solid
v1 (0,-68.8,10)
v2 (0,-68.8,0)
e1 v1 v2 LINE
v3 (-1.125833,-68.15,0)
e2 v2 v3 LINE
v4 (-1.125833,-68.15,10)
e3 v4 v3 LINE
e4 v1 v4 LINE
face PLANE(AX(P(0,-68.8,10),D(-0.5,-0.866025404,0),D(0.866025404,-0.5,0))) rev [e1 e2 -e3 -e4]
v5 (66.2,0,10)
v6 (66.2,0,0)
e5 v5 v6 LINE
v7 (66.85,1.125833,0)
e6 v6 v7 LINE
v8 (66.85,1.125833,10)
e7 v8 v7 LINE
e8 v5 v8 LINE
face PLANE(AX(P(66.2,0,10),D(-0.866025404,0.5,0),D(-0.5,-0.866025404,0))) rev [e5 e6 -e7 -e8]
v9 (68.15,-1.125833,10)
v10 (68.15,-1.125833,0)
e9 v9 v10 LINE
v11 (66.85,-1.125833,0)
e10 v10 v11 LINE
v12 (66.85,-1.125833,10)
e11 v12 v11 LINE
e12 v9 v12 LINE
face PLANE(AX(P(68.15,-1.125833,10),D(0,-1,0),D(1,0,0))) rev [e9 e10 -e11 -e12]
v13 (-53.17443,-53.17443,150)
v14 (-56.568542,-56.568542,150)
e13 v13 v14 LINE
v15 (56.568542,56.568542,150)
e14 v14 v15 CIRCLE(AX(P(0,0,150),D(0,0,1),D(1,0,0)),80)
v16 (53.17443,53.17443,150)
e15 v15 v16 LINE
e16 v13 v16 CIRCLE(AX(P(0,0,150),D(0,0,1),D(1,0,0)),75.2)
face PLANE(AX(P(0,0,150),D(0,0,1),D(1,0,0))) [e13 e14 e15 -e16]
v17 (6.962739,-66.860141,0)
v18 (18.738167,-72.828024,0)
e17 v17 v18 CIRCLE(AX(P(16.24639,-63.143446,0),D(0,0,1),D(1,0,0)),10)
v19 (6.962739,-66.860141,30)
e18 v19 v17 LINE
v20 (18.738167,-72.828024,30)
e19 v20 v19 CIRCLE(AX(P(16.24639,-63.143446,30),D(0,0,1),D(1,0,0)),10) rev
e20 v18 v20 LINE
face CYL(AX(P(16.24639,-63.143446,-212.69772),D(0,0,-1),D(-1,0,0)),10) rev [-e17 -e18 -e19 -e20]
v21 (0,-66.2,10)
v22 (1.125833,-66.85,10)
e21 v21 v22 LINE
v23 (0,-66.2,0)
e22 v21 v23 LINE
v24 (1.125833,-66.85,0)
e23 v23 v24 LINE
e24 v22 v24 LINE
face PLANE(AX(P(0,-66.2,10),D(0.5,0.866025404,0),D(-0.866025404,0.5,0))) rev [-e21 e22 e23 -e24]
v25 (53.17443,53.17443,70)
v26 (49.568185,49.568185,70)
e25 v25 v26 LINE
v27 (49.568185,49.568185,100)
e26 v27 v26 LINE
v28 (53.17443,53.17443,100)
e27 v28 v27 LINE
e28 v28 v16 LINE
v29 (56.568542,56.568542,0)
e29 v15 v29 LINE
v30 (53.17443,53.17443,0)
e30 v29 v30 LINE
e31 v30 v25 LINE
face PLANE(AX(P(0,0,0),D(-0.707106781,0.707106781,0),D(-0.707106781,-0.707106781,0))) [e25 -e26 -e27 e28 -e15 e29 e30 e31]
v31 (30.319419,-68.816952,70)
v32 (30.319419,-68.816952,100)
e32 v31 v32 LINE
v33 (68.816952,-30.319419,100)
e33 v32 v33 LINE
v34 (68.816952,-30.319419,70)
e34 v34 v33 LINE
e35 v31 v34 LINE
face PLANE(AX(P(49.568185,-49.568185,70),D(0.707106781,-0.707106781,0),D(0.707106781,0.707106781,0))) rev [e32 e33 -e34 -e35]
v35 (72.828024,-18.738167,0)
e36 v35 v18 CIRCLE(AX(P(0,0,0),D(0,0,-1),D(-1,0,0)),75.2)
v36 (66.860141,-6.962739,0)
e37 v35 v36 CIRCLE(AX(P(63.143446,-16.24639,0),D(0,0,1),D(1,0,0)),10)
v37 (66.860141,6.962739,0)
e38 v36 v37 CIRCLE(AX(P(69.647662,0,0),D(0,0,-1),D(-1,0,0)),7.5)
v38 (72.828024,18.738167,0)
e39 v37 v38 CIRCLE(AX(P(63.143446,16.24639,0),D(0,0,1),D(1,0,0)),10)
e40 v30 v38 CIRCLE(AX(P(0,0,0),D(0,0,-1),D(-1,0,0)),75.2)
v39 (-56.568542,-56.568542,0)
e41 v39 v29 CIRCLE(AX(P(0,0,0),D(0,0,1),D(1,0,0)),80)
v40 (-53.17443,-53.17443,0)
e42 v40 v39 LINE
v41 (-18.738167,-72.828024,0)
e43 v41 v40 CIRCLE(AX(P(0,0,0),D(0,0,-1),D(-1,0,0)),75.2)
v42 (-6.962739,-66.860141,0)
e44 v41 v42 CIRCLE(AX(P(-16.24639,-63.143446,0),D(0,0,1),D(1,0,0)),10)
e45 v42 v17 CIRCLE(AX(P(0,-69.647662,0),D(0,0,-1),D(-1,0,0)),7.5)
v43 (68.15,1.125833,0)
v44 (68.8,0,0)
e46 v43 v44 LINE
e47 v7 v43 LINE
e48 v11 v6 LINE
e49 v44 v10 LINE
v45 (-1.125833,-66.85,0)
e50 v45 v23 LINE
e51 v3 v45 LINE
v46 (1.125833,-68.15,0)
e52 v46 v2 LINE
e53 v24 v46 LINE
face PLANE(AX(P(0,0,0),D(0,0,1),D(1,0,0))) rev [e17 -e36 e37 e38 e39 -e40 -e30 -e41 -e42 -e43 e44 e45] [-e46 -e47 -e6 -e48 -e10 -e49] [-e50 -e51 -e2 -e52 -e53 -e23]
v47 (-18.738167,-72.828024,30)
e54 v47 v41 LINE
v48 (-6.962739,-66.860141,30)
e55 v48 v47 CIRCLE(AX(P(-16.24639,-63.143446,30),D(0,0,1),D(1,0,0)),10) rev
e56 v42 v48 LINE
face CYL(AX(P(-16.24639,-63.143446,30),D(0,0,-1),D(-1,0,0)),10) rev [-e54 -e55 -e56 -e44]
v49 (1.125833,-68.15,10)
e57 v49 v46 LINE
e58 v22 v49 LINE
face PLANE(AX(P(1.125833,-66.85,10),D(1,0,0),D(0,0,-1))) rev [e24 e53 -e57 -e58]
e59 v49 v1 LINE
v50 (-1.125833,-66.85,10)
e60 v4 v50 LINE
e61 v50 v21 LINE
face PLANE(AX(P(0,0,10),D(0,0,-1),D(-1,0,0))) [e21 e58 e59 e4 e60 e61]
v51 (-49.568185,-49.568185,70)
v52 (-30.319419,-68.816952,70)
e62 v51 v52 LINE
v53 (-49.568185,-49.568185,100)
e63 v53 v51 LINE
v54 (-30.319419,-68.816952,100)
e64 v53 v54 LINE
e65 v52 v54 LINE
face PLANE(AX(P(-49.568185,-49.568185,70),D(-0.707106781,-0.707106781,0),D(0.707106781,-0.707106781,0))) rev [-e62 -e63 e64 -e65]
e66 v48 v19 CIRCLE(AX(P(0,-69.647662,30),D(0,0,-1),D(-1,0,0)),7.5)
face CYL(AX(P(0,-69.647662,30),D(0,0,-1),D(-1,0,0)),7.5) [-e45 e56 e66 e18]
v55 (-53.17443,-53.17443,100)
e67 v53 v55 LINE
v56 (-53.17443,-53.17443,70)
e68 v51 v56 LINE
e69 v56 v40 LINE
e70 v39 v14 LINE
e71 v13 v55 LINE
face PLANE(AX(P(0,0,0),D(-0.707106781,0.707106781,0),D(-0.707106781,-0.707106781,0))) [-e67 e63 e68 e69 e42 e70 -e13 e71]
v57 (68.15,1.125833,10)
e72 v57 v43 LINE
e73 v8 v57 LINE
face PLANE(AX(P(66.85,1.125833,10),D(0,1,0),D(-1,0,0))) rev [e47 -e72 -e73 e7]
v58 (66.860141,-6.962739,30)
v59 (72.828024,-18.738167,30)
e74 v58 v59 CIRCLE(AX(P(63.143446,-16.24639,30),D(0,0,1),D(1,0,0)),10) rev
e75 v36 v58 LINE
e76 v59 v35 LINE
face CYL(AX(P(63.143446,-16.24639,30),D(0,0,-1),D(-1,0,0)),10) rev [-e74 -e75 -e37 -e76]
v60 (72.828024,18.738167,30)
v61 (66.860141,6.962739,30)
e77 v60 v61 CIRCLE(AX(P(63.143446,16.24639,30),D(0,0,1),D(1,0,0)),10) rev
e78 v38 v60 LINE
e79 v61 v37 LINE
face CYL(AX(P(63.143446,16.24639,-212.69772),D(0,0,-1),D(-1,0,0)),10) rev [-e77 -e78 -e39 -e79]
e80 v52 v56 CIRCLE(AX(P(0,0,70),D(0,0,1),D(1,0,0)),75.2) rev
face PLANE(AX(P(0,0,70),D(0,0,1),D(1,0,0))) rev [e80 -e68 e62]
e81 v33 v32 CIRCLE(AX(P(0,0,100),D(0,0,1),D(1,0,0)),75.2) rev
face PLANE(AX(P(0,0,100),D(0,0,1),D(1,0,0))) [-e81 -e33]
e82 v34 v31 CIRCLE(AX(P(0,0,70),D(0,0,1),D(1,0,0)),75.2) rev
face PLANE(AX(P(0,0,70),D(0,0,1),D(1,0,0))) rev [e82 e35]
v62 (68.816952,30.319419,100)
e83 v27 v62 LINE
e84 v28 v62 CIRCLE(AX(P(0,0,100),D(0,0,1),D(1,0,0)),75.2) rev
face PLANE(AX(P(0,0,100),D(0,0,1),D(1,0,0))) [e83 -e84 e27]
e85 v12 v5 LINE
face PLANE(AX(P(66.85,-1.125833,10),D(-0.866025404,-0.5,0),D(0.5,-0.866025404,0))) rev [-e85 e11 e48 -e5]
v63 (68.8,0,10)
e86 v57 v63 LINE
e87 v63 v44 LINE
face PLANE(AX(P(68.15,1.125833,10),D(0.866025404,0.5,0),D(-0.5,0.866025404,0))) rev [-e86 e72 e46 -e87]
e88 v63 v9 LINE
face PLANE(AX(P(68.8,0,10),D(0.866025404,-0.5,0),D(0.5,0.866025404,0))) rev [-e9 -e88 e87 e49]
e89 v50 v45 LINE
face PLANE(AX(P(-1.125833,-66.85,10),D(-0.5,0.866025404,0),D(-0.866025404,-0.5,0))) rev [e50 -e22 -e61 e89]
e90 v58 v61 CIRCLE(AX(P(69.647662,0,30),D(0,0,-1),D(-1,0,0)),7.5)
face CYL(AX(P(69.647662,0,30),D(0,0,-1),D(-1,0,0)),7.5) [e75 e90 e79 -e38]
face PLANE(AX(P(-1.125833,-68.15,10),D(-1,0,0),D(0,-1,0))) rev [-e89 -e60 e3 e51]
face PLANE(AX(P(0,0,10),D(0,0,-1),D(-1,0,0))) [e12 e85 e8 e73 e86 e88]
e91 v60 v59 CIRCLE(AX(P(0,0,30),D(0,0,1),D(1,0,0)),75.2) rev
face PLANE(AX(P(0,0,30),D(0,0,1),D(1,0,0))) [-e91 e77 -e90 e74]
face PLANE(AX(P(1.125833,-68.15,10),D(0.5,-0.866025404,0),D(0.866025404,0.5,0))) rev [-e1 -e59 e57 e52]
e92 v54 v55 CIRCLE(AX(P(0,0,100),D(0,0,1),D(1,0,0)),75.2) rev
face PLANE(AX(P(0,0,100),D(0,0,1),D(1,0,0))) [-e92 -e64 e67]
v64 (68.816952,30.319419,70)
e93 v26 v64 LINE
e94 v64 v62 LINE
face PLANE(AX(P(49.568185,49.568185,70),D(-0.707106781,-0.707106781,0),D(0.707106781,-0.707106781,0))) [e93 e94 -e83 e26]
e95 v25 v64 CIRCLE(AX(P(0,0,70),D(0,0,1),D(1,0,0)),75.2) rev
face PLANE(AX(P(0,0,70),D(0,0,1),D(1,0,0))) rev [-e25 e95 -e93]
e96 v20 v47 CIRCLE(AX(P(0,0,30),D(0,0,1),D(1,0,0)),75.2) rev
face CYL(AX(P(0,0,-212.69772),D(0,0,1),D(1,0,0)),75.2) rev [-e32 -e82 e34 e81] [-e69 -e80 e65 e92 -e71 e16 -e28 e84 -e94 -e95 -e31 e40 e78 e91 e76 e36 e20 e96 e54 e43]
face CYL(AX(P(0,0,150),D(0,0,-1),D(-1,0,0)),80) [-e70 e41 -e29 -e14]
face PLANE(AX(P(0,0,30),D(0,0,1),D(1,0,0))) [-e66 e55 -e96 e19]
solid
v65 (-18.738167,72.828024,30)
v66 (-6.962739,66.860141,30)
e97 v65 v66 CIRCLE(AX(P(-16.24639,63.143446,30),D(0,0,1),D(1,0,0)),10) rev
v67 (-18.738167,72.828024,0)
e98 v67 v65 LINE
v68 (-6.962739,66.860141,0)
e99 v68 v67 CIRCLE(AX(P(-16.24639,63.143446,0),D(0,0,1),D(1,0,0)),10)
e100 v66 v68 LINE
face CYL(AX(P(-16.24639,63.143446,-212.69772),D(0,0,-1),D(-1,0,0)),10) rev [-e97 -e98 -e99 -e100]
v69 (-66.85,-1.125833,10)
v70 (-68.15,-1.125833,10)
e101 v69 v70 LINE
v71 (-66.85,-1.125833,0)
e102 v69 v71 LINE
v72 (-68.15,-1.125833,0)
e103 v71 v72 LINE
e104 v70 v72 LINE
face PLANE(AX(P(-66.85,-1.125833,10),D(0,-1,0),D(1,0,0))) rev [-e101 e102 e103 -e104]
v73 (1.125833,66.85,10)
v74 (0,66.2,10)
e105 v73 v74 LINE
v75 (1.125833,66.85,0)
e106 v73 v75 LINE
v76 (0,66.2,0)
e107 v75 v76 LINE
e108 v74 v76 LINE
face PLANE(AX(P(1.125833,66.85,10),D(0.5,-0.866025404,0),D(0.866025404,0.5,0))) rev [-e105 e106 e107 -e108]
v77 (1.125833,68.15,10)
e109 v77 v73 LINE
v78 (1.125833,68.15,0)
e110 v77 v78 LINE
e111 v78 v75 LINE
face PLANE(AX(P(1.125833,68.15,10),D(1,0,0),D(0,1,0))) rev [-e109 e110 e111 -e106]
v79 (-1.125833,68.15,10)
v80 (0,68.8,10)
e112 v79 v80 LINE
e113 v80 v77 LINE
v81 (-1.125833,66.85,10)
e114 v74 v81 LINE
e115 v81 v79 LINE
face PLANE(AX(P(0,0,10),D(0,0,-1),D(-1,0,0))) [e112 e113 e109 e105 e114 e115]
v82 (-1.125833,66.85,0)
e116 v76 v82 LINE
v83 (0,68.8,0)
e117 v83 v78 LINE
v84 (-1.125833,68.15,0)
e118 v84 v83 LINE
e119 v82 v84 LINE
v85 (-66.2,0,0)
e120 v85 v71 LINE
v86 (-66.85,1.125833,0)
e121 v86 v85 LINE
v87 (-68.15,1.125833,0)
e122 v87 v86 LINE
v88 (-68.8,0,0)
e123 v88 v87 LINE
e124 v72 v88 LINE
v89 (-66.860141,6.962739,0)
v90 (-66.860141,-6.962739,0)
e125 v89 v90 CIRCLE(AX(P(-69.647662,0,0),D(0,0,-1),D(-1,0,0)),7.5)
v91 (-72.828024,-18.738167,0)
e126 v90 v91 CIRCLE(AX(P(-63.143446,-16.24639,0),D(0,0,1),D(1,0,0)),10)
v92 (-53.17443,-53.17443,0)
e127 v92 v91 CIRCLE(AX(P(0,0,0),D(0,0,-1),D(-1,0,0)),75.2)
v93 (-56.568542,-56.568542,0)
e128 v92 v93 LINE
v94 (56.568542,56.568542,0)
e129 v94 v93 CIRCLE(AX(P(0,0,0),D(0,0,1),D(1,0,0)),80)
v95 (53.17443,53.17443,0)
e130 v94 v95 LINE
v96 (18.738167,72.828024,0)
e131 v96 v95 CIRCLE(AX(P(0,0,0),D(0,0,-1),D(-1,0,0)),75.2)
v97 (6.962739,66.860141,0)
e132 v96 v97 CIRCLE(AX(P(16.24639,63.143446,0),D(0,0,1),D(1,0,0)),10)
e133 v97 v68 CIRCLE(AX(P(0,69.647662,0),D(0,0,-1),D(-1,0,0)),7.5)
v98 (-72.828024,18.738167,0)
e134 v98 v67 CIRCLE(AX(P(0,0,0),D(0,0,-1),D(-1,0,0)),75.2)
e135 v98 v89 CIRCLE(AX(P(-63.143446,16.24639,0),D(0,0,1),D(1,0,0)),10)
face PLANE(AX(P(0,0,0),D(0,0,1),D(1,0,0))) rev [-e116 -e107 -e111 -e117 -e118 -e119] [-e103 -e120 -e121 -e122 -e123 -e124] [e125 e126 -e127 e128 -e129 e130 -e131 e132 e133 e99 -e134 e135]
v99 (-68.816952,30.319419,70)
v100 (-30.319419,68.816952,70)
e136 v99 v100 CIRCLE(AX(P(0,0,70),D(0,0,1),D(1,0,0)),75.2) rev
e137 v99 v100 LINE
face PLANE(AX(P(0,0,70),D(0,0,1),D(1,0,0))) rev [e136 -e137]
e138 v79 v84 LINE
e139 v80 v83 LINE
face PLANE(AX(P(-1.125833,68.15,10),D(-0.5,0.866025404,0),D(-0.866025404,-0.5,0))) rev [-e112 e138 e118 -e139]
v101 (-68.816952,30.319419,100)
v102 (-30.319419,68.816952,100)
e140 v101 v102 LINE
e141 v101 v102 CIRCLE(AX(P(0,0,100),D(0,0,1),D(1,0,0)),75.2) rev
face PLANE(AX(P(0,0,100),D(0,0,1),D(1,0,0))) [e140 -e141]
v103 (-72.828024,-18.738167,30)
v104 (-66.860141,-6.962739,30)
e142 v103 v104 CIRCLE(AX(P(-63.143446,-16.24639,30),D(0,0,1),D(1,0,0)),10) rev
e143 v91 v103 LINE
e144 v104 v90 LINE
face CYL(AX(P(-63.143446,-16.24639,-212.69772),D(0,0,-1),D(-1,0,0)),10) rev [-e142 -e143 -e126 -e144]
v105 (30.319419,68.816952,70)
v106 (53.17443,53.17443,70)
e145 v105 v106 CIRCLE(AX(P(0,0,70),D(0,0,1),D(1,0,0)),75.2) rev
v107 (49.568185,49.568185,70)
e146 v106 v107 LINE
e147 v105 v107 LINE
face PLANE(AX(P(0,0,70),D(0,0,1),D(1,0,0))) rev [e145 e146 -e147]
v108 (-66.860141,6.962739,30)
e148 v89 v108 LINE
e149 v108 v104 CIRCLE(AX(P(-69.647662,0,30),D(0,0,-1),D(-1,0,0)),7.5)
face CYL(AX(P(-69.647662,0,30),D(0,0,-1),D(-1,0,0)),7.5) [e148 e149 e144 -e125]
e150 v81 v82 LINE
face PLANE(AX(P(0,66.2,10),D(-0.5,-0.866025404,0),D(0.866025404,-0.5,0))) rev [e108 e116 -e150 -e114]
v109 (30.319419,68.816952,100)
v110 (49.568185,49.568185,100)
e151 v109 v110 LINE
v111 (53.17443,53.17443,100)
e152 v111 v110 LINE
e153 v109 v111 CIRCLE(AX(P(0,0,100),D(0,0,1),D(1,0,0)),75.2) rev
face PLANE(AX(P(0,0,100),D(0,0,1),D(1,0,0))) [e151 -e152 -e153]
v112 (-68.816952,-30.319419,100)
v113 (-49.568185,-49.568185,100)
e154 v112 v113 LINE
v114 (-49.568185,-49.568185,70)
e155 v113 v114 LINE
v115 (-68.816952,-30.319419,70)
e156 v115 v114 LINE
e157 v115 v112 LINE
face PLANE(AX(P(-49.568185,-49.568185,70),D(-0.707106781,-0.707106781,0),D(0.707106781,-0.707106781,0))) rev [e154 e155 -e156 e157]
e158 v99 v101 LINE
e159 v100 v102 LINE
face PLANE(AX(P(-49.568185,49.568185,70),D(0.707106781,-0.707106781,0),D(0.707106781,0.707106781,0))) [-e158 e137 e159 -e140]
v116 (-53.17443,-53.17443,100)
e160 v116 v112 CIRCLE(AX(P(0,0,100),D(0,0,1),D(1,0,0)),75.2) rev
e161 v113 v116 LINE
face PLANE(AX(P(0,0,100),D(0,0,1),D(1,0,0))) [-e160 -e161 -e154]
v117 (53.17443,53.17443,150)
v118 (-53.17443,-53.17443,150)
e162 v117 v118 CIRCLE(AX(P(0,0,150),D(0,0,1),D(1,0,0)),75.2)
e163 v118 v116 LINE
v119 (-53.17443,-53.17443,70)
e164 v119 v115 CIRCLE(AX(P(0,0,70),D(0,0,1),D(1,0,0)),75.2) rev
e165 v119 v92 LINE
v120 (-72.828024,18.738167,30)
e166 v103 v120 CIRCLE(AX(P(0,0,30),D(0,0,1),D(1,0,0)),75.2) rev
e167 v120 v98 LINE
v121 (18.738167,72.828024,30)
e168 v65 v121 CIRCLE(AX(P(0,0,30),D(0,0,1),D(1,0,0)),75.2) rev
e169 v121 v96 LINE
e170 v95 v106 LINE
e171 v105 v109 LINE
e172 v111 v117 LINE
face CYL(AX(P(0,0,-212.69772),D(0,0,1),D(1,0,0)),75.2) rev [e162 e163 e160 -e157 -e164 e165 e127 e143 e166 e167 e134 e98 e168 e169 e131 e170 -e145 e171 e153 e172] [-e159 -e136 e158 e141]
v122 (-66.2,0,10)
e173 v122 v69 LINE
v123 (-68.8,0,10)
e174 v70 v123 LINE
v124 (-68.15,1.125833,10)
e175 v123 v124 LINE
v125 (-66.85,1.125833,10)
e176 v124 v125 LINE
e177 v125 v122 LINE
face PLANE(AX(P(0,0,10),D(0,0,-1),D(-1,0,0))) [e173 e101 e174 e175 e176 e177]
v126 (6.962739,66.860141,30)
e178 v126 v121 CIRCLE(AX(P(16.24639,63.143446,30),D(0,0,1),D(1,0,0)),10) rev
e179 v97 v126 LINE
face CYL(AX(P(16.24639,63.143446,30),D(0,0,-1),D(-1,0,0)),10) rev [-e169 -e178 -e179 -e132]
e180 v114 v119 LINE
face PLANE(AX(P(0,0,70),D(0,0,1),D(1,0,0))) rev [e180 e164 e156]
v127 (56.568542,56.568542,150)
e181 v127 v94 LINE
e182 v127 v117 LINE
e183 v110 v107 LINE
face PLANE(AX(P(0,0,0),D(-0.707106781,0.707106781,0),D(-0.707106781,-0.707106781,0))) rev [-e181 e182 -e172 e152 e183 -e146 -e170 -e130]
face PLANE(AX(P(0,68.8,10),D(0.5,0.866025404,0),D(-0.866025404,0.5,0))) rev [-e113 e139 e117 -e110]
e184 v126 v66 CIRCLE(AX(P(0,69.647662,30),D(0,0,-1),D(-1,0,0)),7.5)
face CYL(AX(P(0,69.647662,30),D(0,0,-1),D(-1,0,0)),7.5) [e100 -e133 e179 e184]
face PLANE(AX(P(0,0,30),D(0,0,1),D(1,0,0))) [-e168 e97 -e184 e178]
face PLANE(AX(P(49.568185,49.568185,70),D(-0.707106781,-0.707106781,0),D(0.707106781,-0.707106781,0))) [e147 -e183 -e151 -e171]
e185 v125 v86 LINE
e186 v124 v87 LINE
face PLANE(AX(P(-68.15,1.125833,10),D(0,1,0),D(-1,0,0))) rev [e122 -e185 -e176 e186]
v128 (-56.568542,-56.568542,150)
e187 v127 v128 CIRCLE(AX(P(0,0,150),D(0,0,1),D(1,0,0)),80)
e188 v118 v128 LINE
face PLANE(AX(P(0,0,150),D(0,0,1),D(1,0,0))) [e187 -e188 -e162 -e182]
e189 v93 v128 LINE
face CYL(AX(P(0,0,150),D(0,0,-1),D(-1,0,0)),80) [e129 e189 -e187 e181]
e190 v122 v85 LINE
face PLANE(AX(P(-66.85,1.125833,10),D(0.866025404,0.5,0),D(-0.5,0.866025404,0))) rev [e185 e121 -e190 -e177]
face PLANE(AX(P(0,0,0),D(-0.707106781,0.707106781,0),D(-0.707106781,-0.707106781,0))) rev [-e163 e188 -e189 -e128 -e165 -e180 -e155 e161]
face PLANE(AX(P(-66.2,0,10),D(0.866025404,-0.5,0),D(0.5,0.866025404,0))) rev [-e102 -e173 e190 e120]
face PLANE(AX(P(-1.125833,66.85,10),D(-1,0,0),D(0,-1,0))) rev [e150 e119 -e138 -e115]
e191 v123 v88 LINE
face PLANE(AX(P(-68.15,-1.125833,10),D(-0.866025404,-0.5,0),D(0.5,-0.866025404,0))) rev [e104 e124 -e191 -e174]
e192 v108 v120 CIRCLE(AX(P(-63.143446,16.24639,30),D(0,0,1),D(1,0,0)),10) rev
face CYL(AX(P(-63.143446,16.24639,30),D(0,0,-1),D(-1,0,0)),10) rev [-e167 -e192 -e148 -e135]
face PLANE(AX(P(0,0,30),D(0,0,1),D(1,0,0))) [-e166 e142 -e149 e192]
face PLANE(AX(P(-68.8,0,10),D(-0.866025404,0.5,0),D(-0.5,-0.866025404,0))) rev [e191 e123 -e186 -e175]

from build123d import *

# Parameters (mm, degrees)
SKETCH_1_R          = 80
EXTRUDE_1_DEPTH     = 150
CUT_EXTRUDE_1_DEPTH = 10
SKETCH_4_R          = 75.2
CUT_EXTRUDE_2_DEPTH = 120
EXTRUDE_START       = -50
EXTRUDE_2_DEPTH     = 30
CUT_EXTRUDE_START   = -30
CUT_EXTRUDE_3_DEPTH = 30
FILLET_1_R          = 10


# Read off the part's stored shape, not the designer's step: 交差1
with BuildPart() as part:
    # ｽｹｯﾁ1 → ﾎﾞｽ - 押し出し1 (new body)
    with BuildSketch(Plane.XY):
        Circle(SKETCH_1_R)
    extrude(amount=EXTRUDE_1_DEPTH)

    # ｽｹｯﾁ2 → ｶｯﾄ - 押し出し1 (cut)
    with BuildSketch(Plane(origin=(0, 0, 0), x_dir=(-1, 0, 0), z_dir=(0, 0, -1))):
        Polygon((-68.8, 0), (-68.15, -1.125833025), (-66.85, -1.125833025), (-66.2, 0), (-66.85, 1.125833025), (-68.15, 1.125833025), align=None)
        Polygon((0, -68.8), (1.125833025, -68.15), (1.125833025, -66.85), (0, -66.2), (-1.125833025, -66.85), (-1.125833025, -68.15), align=None)
        Polygon((0, 68.8), (-1.125833025, 68.15), (-1.125833025, 66.85), (0, 66.2), (1.125833025, 66.85), (1.125833025, 68.15), align=None)
        Polygon((68.8, 0), (68.15, 1.125833025), (66.85, 1.125833025), (66.2, 0), (66.85, -1.125833025), (68.15, -1.125833025), align=None)
    extrude(amount=-CUT_EXTRUDE_1_DEPTH, mode=Mode.SUBTRACT)

    # ｽｹｯﾁ4 → ｶｯﾄ - 押し出し2 (cut)
    with BuildSketch(Plane.XY.offset(150)):
        Circle(SKETCH_4_R)
    extrude(amount=-CUT_EXTRUDE_2_DEPTH, mode=Mode.SUBTRACT)

    # ｽｹｯﾁ5 → ﾎﾞｽ - 押し出し2 (add)
    with BuildSketch(Plane.XY.offset(150).offset(EXTRUDE_START)):
        with BuildLine():
            Line((68.816951555, -30.319419167), (30.319419167, -68.816951555))
            ThreePointArc((30.319419167, -68.816951555), (53.174429945, -53.174429945), (68.816951555, -30.319419167))
        make_face()
        with BuildLine():
            ThreePointArc((68.816951555, 30.319419167), (53.174429945, 53.174429945), (30.319419167, 68.816951555))
            Line((30.319419167, 68.816951555), (68.816951555, 30.319419167))
        make_face()
        with BuildLine():
            Line((-30.319419167, -68.816951555), (-68.816951555, -30.319419167))
            ThreePointArc((-68.816951555, -30.319419167), (-53.174429945, -53.174429945), (-30.319419167, -68.816951555))
        make_face()
        with BuildLine():
            ThreePointArc((-30.319419167, 68.816951555), (-53.174429945, 53.174429945), (-68.816951555, 30.319419167))
            Line((-68.816951555, 30.319419167), (-30.319419167, 68.816951555))
        make_face()
    extrude(amount=-EXTRUDE_2_DEPTH)

    # ｽｹｯﾁ6 → ｶｯﾄ - 押し出し3 (cut)
    with BuildSketch(Plane(origin=(0, 0, 0), x_dir=(-1, 0, 0), z_dir=(0, 0, -1)).offset(CUT_EXTRUDE_START)):
        with BuildLine():
            Line((7.5, -69.64766161), (7.5, -74.825062646))
            ThreePointArc((7.5, -74.825062646), (53.174429945, -53.174429945), (74.825062646, -7.5))
            Line((74.825062646, -7.5), (69.64766161, -7.5))
            ThreePointArc((69.64766161, -7.5), (62.14766161, 0), (69.64766161, 7.5))
            Line((69.64766161, 7.5), (74.825062646, 7.5))
            ThreePointArc((74.825062646, 7.5), (53.174429945, 53.174429945), (7.5, 74.825062646))
            Line((7.5, 74.825062646), (7.5, 69.64766161))
            ThreePointArc((7.5, 69.64766161), (0, 62.14766161), (-7.5, 69.64766161))
            Line((-7.5, 69.64766161), (-7.5, 74.825062646))
            ThreePointArc((-7.5, 74.825062646), (-53.174429945, 53.174429945), (-74.825062646, 7.5))
            Line((-74.825062646, 7.5), (-69.64766161, 7.5))
            ThreePointArc((-69.64766161, 7.5), (-62.14766161, 0), (-69.64766161, -7.5))
            Line((-69.64766161, -7.5), (-74.825062646, -7.5))
            ThreePointArc((-74.825062646, -7.5), (-53.174429945, -53.174429945), (-7.5, -74.825062646))
            Line((-7.5, -74.825062646), (-7.5, -69.64766161))
            ThreePointArc((-7.5, -69.64766161), (0, -62.14766161), (7.5, -69.64766161))
        make_face()
    extrude(amount=CUT_EXTRUDE_3_DEPTH, mode=Mode.SUBTRACT)

    # ﾌｨﾚｯﾄ1
    # the kernel refuses this fillet: 10 mm, written as the material it adds along each edge
    with BuildSketch(Plane(origin=(-7.5, -74.825062646, 30), x_dir=(0.06730051941695048, 0.9977327498314409, 0), z_dir=(0, 0, -1)), Plane(origin=(74.825062646, -7.5, 30), x_dir=(-0.9977327498314487, 0.06730051941683622, 0), z_dir=(0, 0, -1))) as fillet_1_piece_1:
        with BuildLine():
            CenterArc((11.066494574, -9.51273846), FILLET_1_R, 107.959660536, 82.610248426)
            Line((1.236176348, -11.347089457), (0.253144526, -11.530524557))
            ThreePointArc((0.253144526, -11.530524557), (-0.591630476, -5.805334082), (-0.999470338, -0.032542953))
            Line((-0.999470338, -0.032542953), (0.067300519, 0.99773275))
            ThreePointArc((0.067300519, 0.99773275), (5.232963092, 0.649290971), (7.67467405, 0.951273846))
            Line((7.67467405, 0.951273846), (7.983021371, 0))
        make_face()
    extrude(amount=30)
    with BuildSketch(Plane(origin=(7.5, -74.825062646, 30), x_dir=(-0.0673005194169865, 0.9977327498314384, 0), z_dir=(0, 0, -1)), Plane(origin=(74.825062646, 7.5, 30), x_dir=(-0.9977327498314484, -0.06730051941683877, 0), z_dir=(0, 0, -1)), Plane(origin=(-7.5, 74.825062646, 30), x_dir=(0.06730051941695114, -0.9977327498314409, 0), z_dir=(0, 0, -1)), Plane(origin=(-74.825062646, -7.5, 30), x_dir=(0.9977327498314408, 0.06730051941695224, 0), z_dir=(0, 0, -1))) as fillet_1_piece_2:
        with BuildLine():
            CenterArc((11.066494574, 9.51273846), FILLET_1_R, 169.430091038, 82.610248426)
            Line((1.236176348, 11.347089457), (0.253144526, 11.530524557))
            ThreePointArc((0.253144526, 11.530524557), (-0.591630476, 5.805334082), (-0.999470338, 0.032542953))
            Line((-0.999470338, 0.032542953), (0.067300519, -0.99773275))
            ThreePointArc((0.067300519, -0.99773275), (5.232963092, -0.649290971), (7.67467405, -0.951273846))
            Line((7.67467405, -0.951273846), (7.983021371, 0))
        make_face()
    extrude(amount=30)
    with BuildSketch(Plane(origin=(7.5, 74.825062646, 30), x_dir=(0.9845754560229286, -0.17496048524521768, 0), z_dir=(0, 0, -1)), Plane(origin=(-74.825062646, 7.5, 30), x_dir=(0.17496048524522154, 0.9845754560229281, 0), z_dir=(0, 0, -1))) as fillet_1_piece_3:
        with BuildLine():
            CenterArc((10.65530205, 9.971160082), FILLET_1_R, 191.7422545, 82.610248426)
            Line((0.864572123, 7.936066107), (-0.11450087, 7.732556709))
            ThreePointArc((-0.11450087, 7.732556709), (-0.078734858, 5.272502471), (-0.984575456, 0.174960485))
            Line((-0.984575456, 0.174960485), (-0.075892465, -0.997116008))
            ThreePointArc((-0.075892465, -0.997116008), (5.707113349, -1.216876184), (11.490119163, -0.997116008))
            Line((11.490119163, -0.997116008), (11.414226698, 0))
        make_face()
    extrude(amount=30)


with BuildPart() as body_2:
    # 交差1: the piece on the far side of the plane
    add(part.part)
    split(bisect_by=Plane(origin=(0, 0, 0), x_dir=(0.707106781186548, 0.707106781186547, 0), z_dir=(0.707106781186547, -0.707106781186548, 0)), keep=Keep.BOTTOM)


with BuildPart() as part_1:
    add(part.part)

    # 交差1
    split(bisect_by=Plane(origin=(0, 0, 0), x_dir=(0.707106781186548, 0.707106781186547, 0), z_dir=(0.707106781186547, -0.707106781186548, 0)), keep=Keep.TOP)


solid = Compound([body_2.part, part_1.part])
